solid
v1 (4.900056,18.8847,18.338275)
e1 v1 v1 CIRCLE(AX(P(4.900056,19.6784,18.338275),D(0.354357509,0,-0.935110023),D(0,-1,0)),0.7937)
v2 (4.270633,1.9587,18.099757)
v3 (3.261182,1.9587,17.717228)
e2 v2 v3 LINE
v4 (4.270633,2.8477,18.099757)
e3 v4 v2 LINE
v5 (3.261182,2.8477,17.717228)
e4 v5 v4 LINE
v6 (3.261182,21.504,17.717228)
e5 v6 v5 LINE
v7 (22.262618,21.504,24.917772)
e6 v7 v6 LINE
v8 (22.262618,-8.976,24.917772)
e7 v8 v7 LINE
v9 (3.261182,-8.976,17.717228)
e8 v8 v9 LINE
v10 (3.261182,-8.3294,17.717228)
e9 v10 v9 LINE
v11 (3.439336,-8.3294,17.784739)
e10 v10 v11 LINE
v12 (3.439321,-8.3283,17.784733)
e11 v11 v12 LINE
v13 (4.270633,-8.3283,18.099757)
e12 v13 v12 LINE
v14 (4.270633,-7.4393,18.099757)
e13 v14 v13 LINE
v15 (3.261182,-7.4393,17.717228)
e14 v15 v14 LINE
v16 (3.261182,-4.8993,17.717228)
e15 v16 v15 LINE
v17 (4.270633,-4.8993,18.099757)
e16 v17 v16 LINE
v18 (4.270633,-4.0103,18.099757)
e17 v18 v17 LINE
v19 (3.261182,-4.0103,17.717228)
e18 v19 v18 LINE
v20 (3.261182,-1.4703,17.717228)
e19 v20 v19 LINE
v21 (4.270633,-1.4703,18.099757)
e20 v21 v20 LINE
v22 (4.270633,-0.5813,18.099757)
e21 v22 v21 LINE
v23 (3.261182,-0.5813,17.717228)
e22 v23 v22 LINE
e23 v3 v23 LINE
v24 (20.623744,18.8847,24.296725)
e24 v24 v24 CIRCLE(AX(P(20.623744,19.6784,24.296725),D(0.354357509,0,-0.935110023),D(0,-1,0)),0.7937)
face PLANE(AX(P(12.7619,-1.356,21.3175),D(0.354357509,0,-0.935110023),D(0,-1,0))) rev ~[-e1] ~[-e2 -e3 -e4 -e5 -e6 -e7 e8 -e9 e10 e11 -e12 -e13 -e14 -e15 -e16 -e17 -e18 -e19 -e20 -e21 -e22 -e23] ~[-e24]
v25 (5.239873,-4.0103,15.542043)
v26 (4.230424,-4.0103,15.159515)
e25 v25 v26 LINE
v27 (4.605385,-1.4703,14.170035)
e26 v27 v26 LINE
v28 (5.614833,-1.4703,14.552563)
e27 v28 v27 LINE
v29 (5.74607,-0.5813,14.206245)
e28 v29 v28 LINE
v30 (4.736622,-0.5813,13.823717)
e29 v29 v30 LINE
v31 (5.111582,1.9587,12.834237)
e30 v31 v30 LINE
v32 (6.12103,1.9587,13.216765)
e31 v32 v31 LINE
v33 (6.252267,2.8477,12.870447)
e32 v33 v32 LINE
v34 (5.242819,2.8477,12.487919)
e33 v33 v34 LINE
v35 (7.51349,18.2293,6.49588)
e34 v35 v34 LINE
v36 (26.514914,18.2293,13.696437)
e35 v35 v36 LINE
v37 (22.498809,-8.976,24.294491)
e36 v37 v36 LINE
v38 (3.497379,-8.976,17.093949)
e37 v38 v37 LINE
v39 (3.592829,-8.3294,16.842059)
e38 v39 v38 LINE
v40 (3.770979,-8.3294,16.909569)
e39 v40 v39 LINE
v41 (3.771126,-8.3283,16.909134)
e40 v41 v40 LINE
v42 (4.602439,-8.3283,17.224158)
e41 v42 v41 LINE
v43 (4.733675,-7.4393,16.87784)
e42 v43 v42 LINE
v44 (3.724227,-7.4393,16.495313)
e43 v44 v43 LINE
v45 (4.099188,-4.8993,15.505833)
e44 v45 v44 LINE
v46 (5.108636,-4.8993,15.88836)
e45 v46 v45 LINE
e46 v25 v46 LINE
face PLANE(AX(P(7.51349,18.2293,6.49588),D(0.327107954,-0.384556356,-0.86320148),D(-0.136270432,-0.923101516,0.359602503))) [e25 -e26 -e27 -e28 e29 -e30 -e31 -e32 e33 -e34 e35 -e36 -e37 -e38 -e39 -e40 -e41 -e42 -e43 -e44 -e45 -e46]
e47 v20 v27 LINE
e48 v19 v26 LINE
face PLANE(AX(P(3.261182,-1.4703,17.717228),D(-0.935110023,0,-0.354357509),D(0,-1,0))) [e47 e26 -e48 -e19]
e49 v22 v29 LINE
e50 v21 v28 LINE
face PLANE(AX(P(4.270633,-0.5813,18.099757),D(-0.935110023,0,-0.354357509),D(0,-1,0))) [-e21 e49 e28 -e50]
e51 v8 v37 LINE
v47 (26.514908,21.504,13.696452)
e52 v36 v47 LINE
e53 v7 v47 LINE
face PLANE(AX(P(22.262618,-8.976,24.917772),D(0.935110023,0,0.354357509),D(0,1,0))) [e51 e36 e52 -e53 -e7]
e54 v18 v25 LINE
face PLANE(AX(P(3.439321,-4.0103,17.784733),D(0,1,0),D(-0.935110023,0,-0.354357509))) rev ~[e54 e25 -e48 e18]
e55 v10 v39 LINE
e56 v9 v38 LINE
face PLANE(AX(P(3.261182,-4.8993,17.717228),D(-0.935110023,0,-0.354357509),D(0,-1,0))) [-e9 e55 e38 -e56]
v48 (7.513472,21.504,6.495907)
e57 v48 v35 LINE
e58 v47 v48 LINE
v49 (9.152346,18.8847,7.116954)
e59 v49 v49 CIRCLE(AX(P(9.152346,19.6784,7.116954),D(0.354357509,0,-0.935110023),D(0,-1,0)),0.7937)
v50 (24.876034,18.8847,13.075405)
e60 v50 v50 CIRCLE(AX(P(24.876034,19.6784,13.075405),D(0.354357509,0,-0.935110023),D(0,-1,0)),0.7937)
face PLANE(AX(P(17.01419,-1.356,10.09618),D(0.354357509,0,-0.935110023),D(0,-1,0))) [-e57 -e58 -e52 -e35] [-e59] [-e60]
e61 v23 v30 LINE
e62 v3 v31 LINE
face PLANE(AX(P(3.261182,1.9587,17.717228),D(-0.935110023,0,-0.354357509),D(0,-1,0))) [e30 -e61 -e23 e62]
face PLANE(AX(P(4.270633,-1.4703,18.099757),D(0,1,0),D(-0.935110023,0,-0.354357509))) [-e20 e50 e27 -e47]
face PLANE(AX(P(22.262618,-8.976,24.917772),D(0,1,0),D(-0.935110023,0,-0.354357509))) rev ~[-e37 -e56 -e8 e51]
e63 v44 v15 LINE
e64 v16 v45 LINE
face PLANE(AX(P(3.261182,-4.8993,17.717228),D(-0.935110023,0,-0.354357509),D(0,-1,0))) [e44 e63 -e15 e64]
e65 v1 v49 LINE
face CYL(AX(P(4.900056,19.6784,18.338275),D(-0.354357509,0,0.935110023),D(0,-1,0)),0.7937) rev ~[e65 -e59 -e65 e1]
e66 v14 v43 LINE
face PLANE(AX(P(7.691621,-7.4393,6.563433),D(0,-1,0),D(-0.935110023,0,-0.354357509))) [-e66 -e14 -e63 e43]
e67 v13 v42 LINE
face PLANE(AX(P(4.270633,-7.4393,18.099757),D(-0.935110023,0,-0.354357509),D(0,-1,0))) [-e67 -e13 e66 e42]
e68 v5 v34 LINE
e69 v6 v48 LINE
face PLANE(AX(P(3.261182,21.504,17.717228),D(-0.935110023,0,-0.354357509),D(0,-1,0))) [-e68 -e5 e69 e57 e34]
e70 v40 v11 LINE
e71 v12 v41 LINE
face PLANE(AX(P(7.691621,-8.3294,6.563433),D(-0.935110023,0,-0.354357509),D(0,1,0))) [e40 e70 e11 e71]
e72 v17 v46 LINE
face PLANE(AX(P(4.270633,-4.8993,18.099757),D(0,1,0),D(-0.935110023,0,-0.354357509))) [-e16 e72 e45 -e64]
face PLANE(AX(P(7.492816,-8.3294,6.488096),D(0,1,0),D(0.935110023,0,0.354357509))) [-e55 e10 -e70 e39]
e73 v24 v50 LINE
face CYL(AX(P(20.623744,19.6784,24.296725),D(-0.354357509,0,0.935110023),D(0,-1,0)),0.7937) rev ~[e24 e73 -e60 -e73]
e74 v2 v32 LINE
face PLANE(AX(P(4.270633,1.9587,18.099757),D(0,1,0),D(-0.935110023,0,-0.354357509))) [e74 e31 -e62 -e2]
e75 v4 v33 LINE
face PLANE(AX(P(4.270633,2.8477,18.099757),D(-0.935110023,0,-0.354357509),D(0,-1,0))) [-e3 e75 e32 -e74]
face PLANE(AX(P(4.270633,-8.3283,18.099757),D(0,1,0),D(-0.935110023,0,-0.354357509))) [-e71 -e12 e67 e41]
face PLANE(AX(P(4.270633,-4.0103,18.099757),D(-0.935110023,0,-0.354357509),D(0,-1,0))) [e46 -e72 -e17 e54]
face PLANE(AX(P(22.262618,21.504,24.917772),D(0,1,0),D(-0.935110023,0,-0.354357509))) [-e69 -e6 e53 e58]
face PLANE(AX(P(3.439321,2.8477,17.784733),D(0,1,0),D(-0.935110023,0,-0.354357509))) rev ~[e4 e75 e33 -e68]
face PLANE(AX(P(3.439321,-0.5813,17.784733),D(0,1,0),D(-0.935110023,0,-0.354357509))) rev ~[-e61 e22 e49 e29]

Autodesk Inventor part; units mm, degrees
ref_plane "YZ Plane" through (0, 0, 0) normal (1, 0, 0) x (0, 1, 0)
ref_plane "XZ Plane" through (0, 0, 0) normal (0, 1, 0) x (-1, 0, 0)
ref_plane "XY Plane" through (0, 0, 0) normal (0, 0, 1) x (1, 0, 0)
ref_plane "Work Plane1" through (12.7619, -1.356, 21.3175) normal (0.3543575, 0, -0.93511) x (0, -1, 0)
sketch "Sketch1" plane through (12.7619, -1.356, 21.3175) normal (0.3543575, 0, -0.93511) x (0, -1, 0)
  line L0 (-22.86, -10.16) -> (-22.86, 10.16) projected
  line L1 (7.62, -10.16) -> (-22.86, -10.16)
  line L2 (-22.86, 10.16) -> (22.86, 10.16) projected
  line L3 (0.1143, 9.0805) -> (0.1143, 9.9695) projected
  line L4 (-0.7747, 9.0805) -> (0.1143, 9.0805) projected
  line L5 (-0.7747, 9.9695) -> (-0.7747, 9.0805) projected
  line L6 (0.1143, 9.9695) -> (-0.7747, 9.9695) projected
  line L7 (6.9723, 9.0805) -> (6.9723, 9.9695) projected
  line L8 (6.0833, 9.0805) -> (6.9723, 9.0805) projected
  line L9 (6.0833, 9.9695) -> (6.0833, 9.0805) projected
  line L10 (6.9723, 9.9695) -> (6.0833, 9.9695) projected
  line L11 (3.5433, 9.0805) -> (3.5433, 9.9695) projected
  line L12 (2.6543, 9.0805) -> (3.5433, 9.0805) projected
  line L13 (2.6543, 9.9695) -> (2.6543, 9.0805) projected
  line L14 (3.5433, 9.9695) -> (2.6543, 9.9695) projected
  line L15 (-3.3147, 9.0805) -> (-3.3147, 9.9695) projected
  line L16 (-4.2037, 9.0805) -> (-3.3147, 9.0805) projected
  line L17 (-4.2037, 9.9695) -> (-4.2037, 9.0805) projected
  line L18 (-3.3147, 9.9695) -> (-4.2037, 9.9695) projected
  circle A0 centre (21.0344, 8.4074) radius 0.7937 projected
  circle A1 centre (21.0344, -8.4074) radius 0.7937 projected
  circle A2 centre (-21.0344, 8.4074) radius 0.7937 projected
  circle A3 centre (-21.0344, -8.4074) radius 0.7937 projected
  line L19 (-4.2037, 9.9695) -> (-4.2037, 10.16)
  line L20 (-3.3147, 9.9695) -> (-3.3147, 10.16)
  line L21 (-0.7747, 9.9695) -> (-0.7747, 10.16)
  line L22 (0.1143, 9.9695) -> (0.1143, 10.16)
  line L23 (2.6543, 9.9695) -> (2.6543, 10.16)
  line L24 (3.5433, 9.9695) -> (3.5433, 10.16)
  line L25 (-22.86, -10.16) -> (7.62, -10.16)
  line L26 (7.62, -10.16) -> (7.62, 10.16)
  point P0 (-1.356, 19.4878)
  dimension "d0" = 30.48
extrude "Extrusion1" add sketch "Sketch1" along normal blind 12 contours L0 L2 L19 L17 L16 L15 L20 L21 L5 L4 L3 L22 L23 L13 L12 L11 L24 L26 L1
sketch "Sketch2" plane through (17.0142, -1.356, 10.0962) normal (0.3543575, 0, -0.93511) x (-0.93511, 0, -0.3543575)
  line L0 (9.9695, -6.0833) -> (10.1821, -6.0833)
  line L1 (10.1821, -6.0833) -> (10.1821, -6.9734)
  line L2 (10.1821, -6.9734) -> (9.9695, -6.9734)
  line L3 (9.9695, -6.9734) -> (9.9695, -6.0833)
  point P0 (19.4878, 1.356)
extrude "Extrusion2" cut sketch "Sketch2" against normal through all
sketch "Sketch3" plane through (3.2612, 2.8477, 17.7172) normal (-0.93511, 0, -0.3543575) x (-0.3543575, 0, 0.93511)
  line L0 (-12, 0) -> (-12, 18.6563) projected
  line L1 (-12, 15.3816) -> (-0.6665, -11.8237)
  line L2 (0, -11.8237) -> (-12, -11.8237) projected
  line L3 (-0.6665, -11.8237) -> (-12, -11.8237)
  line L4 (-12, -11.8237) -> (-12, 15.3816)
  point P0 (-15.4119, -2.8477)
extrude "Extrusion3" cut sketch "Sketch3" against normal through all
properties part number "USSensor Backing"
